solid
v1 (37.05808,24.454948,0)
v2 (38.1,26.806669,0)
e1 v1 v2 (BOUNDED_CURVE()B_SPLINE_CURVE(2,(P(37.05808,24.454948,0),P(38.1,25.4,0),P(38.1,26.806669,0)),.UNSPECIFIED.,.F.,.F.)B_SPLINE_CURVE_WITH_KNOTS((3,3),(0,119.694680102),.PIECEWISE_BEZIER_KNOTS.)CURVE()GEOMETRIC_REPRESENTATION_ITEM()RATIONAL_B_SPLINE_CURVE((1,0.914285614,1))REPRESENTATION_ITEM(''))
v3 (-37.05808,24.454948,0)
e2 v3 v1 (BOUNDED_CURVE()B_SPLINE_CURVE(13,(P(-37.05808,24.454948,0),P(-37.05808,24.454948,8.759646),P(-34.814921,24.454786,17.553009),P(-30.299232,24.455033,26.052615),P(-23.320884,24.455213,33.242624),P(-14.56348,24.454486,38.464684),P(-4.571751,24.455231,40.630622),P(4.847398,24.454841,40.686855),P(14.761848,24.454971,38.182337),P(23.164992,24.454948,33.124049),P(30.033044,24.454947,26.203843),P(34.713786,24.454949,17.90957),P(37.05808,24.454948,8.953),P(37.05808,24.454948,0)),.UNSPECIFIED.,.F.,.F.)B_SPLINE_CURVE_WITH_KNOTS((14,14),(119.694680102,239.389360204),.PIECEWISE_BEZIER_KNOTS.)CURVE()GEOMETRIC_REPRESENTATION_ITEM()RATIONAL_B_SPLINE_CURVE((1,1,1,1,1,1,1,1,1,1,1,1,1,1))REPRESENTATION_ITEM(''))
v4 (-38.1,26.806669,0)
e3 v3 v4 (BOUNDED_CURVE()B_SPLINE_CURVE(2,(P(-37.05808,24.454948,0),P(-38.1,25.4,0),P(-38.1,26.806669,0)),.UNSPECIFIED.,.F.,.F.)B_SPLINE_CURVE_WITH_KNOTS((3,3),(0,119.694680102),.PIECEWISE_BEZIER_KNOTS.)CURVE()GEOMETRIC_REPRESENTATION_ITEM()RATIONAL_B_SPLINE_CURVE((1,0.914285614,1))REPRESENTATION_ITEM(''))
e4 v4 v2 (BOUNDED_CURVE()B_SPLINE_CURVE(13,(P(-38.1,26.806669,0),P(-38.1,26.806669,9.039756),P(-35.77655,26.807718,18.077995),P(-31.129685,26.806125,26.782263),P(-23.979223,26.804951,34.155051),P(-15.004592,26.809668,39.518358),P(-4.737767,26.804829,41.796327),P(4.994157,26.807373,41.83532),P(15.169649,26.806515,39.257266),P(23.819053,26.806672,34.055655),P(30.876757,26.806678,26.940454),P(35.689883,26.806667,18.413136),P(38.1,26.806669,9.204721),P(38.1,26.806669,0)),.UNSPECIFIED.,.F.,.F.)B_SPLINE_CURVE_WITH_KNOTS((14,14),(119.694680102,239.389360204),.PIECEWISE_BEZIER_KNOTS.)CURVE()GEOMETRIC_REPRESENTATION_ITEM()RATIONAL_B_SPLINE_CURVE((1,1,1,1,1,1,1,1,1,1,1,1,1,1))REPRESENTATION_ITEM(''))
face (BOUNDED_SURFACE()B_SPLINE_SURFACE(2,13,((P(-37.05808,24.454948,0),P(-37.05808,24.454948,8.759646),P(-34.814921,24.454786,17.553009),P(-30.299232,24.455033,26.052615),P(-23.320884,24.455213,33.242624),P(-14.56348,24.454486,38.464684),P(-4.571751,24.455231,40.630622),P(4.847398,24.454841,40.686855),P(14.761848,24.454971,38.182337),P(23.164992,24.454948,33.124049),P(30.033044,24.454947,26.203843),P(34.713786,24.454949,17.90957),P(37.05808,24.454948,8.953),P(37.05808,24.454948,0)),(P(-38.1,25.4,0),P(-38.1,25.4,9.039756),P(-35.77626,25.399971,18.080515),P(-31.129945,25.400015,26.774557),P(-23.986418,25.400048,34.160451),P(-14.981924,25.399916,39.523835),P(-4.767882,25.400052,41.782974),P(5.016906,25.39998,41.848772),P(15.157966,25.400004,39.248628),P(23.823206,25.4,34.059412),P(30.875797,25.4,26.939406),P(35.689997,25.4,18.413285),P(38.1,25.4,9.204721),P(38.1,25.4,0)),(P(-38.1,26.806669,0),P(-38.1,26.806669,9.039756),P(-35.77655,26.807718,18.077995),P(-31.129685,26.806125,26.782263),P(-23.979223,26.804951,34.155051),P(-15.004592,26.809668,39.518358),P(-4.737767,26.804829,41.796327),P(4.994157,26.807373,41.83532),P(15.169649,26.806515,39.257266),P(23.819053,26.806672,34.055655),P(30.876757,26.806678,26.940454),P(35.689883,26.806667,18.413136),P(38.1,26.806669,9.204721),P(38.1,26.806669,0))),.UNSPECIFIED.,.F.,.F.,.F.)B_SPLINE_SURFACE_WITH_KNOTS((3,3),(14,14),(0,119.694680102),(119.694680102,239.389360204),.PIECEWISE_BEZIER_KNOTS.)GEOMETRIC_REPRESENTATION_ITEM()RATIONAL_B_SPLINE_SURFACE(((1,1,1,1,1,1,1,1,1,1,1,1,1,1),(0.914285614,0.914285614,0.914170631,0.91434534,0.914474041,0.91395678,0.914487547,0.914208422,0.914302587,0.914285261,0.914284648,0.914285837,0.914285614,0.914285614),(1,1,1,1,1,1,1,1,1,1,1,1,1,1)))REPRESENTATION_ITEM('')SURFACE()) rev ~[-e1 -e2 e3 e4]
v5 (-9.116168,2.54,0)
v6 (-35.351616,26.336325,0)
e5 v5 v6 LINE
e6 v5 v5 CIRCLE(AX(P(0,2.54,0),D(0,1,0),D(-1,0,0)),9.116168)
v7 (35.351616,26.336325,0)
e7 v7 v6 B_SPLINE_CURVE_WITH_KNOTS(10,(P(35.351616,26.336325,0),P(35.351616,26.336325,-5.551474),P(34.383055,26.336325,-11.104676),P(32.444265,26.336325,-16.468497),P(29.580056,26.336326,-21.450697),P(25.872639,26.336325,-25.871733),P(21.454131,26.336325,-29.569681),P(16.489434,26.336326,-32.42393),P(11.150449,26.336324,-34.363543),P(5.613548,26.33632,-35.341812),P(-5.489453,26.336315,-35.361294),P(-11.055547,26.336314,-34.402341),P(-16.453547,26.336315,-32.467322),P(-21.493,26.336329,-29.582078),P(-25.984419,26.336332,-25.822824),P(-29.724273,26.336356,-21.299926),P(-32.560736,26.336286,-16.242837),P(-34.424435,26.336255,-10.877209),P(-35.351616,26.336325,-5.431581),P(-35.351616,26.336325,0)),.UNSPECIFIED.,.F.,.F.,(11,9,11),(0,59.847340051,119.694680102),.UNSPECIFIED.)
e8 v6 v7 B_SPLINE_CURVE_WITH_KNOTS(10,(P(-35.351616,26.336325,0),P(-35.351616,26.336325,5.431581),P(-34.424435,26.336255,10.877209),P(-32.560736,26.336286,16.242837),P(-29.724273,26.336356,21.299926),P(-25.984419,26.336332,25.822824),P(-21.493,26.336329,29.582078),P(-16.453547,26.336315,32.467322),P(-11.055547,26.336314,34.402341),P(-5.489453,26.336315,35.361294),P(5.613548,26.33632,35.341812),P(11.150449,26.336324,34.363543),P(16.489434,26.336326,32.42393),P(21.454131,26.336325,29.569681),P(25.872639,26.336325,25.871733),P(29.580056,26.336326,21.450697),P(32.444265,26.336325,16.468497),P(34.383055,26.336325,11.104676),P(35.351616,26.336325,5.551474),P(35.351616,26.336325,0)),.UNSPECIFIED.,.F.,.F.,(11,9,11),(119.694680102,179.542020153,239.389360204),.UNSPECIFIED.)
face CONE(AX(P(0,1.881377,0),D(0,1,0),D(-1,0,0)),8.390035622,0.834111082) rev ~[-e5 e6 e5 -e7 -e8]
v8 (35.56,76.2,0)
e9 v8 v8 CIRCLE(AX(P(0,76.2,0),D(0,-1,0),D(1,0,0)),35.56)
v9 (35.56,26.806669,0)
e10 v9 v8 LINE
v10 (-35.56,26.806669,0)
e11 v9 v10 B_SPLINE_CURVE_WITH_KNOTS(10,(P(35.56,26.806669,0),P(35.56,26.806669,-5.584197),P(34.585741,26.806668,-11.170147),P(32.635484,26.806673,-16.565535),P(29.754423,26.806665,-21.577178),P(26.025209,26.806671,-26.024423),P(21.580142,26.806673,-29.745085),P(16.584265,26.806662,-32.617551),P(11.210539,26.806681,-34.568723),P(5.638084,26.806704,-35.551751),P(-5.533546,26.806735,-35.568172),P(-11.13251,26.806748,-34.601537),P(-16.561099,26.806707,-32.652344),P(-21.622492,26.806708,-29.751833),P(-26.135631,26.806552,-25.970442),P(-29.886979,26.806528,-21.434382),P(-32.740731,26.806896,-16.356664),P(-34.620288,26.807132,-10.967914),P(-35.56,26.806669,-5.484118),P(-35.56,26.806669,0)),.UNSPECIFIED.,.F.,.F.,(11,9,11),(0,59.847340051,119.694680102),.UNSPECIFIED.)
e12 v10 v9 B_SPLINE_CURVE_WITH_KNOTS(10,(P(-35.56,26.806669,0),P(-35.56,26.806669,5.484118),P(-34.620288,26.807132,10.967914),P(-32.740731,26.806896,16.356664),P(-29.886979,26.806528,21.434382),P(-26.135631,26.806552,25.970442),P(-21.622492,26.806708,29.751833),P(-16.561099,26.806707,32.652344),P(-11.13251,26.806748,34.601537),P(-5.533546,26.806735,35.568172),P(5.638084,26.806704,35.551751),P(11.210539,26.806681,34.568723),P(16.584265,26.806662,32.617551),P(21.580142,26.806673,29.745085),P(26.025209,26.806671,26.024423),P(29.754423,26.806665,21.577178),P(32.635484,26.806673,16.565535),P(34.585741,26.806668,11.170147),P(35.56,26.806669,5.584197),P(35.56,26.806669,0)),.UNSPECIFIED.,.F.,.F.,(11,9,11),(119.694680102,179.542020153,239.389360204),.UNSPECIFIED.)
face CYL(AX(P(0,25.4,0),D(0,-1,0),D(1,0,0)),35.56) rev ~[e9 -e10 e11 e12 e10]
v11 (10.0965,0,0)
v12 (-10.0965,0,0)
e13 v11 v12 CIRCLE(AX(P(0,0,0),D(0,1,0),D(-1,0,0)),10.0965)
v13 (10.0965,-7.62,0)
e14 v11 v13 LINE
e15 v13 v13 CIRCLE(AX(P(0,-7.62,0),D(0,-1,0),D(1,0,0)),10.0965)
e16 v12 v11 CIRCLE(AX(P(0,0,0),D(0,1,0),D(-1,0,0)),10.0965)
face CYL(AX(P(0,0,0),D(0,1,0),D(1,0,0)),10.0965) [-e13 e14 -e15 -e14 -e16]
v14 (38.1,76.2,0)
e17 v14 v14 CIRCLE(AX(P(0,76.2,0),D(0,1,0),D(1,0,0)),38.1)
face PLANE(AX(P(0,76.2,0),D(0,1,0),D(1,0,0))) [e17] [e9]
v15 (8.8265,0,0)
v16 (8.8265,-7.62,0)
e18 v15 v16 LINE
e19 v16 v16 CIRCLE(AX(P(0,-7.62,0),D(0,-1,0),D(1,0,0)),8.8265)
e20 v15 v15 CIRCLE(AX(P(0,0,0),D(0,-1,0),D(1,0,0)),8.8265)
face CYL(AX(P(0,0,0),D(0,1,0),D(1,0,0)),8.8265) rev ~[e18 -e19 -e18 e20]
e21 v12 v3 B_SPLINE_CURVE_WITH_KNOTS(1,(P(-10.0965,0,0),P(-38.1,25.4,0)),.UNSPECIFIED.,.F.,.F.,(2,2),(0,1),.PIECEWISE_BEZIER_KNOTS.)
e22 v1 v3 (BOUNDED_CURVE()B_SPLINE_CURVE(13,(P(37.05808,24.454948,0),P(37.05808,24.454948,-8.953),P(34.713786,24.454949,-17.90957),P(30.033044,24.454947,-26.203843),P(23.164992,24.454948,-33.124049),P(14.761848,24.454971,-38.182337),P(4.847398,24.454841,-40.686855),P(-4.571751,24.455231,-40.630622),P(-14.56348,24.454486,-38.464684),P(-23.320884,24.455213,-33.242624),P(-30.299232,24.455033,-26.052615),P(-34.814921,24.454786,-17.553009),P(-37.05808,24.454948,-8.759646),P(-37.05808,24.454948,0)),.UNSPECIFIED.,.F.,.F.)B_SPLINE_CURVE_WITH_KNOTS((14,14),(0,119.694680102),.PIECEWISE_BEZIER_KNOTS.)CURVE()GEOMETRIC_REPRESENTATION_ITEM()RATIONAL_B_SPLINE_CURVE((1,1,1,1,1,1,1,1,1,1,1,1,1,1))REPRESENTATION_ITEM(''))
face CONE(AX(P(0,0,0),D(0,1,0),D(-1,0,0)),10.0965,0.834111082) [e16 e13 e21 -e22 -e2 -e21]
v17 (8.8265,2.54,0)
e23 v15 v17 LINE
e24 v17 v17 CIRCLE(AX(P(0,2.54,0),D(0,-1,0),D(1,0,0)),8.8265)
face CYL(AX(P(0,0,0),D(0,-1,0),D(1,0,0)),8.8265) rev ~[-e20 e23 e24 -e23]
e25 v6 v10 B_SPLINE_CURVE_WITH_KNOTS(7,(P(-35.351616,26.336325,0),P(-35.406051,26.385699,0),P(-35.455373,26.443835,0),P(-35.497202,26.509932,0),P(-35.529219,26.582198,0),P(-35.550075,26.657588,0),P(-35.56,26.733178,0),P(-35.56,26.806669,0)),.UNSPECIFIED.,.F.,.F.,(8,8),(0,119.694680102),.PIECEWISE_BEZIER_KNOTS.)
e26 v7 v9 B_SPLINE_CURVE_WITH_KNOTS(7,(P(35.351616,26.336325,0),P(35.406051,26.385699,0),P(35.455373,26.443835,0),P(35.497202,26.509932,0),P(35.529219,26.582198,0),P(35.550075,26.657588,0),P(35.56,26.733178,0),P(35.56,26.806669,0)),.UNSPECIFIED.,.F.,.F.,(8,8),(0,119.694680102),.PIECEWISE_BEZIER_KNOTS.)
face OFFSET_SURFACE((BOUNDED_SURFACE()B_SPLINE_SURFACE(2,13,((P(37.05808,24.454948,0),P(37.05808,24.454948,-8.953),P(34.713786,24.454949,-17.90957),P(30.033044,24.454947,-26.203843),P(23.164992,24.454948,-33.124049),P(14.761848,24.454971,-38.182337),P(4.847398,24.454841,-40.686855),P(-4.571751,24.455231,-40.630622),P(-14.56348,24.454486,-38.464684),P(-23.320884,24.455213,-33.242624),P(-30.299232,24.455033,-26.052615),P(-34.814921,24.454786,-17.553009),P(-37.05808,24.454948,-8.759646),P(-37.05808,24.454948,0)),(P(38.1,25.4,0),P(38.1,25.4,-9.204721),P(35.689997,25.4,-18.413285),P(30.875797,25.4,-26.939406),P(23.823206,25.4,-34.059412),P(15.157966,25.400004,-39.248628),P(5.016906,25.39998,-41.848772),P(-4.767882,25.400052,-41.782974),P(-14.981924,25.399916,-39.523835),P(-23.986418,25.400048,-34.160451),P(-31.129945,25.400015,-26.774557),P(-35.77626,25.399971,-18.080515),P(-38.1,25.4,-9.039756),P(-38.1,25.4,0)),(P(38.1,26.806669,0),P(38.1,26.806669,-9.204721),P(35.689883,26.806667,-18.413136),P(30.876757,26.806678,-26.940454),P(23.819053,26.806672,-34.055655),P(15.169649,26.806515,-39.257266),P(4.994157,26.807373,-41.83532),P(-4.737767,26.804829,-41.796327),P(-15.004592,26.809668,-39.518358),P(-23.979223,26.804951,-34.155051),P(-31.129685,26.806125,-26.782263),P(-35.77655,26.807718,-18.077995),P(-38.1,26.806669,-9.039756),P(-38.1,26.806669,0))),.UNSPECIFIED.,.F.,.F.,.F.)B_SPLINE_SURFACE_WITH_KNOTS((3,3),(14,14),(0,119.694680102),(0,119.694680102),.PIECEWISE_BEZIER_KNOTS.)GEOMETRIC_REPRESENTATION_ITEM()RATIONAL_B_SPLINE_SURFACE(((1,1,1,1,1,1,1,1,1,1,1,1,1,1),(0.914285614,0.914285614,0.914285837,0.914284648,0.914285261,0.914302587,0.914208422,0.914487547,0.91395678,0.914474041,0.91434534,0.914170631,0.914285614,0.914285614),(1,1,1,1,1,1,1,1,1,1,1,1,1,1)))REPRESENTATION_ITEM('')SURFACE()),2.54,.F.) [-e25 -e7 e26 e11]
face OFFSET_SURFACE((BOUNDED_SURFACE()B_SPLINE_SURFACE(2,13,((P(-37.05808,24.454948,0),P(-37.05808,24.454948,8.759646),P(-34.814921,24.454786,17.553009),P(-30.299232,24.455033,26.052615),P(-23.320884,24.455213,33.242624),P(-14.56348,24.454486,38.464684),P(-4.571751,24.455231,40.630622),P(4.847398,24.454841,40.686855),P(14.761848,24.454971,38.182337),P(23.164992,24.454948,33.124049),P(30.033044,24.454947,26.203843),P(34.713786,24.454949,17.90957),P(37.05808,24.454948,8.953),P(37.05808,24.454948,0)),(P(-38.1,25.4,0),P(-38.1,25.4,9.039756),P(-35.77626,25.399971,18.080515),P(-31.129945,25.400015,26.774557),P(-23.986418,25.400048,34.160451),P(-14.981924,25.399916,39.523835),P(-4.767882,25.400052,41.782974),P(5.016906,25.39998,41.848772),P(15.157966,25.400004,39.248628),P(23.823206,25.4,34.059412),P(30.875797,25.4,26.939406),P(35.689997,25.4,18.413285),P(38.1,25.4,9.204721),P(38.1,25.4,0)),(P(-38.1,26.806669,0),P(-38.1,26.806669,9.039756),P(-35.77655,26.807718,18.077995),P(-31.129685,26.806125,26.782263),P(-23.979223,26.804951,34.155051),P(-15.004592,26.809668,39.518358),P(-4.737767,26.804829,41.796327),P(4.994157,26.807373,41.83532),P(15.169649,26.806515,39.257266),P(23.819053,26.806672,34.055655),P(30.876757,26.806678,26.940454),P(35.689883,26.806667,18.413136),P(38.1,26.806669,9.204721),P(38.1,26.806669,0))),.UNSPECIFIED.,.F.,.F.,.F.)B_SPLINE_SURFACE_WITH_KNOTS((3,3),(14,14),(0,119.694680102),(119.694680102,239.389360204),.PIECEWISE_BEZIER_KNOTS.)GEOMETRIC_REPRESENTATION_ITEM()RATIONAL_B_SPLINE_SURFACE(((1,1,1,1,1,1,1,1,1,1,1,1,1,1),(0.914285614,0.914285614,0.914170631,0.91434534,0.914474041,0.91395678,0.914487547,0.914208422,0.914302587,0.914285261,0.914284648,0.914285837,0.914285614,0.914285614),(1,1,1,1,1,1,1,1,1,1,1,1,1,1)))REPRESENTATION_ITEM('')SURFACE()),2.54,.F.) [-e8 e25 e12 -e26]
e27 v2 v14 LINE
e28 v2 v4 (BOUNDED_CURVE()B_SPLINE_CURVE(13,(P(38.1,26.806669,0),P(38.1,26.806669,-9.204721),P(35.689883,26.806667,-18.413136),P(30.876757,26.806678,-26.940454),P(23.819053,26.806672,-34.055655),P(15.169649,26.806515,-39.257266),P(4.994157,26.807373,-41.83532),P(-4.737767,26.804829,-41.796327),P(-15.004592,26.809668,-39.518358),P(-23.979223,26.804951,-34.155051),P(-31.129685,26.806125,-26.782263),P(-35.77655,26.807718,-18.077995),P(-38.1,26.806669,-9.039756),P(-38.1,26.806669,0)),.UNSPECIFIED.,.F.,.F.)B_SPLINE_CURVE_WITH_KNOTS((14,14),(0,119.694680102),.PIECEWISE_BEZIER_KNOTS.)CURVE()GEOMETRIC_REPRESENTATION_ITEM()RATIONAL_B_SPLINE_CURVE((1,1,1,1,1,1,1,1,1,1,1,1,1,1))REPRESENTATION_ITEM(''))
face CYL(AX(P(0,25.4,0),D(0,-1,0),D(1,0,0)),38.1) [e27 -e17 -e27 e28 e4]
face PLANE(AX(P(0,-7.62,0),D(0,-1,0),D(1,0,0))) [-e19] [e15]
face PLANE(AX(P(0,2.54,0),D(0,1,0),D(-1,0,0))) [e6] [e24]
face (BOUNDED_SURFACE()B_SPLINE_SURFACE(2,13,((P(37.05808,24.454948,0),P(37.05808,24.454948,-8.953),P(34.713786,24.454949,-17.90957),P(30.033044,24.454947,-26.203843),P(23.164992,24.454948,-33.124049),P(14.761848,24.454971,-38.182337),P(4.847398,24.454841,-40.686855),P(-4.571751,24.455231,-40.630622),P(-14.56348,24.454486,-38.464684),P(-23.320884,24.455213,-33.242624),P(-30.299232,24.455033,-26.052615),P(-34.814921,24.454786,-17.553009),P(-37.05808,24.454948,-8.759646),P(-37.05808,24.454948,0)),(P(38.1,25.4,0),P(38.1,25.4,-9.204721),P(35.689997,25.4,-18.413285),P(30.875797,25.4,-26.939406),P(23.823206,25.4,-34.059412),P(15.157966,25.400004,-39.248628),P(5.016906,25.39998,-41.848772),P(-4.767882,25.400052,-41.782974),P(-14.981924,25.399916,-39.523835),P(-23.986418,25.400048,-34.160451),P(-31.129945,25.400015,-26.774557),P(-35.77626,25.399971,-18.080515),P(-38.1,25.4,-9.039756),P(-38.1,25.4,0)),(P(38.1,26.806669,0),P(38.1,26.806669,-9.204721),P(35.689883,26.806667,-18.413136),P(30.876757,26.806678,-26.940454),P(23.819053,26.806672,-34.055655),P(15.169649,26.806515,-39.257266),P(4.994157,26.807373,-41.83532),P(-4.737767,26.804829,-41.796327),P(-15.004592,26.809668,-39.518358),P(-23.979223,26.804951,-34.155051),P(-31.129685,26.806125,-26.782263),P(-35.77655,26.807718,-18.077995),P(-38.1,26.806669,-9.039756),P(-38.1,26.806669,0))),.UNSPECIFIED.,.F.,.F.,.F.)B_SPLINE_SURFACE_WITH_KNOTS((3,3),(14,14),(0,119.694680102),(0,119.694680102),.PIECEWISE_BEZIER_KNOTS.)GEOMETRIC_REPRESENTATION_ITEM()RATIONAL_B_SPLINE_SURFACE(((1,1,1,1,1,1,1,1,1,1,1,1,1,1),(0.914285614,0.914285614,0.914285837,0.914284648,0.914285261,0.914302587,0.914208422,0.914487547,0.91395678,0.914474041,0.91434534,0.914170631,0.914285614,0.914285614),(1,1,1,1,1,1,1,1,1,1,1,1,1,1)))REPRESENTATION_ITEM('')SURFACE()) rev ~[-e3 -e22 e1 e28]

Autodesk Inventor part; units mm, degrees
ref_plane "YZ Plane" through (0, 0, 0) normal (1, 0, 0) x (0, 1, 0)
ref_plane "XZ Plane" through (0, 0, 0) normal (0, 1, 0) x (-1, 0, 0)
ref_plane "XY Plane" through (0, 0, 0) normal (0, 0, 1) x (1, 0, 0)
sketch "Sketch1" plane through (0, 0, 0) normal (0, 1, 0) x (-1, 0, 0)
  circle A0 centre (0, 0) radius 10.0965
  dimension "d0" = 20.193
extrude "Extrusion1" add sketch "Sketch1" along normal blind 25.4
sketch "Sketch2" plane through (0, 25.4, 0) normal (0, 1, 0) x (1, 0, 0)
  circle A0 centre (0, 0) radius 10.0965 projected
  circle A1 centre (0, 0) radius 38.1
  dimension "d3" = 76.2
extrude "Extrusion2" add sketch "Sketch2" along normal blind 50.8
loft "Loft1" add section 1 edges at (10.0965, 0, 0) section 2 edges at (-38.1, 25.4, 0)
fillet "Fillet1" radius 3.175 2 edges at (0, 25.4, -38.1) (0, 25.4, 38.1)
sketch "Sketch3" plane through (0, 25.4, 0) normal (0, 1, 0) x (1, 0, 0)
  circle A0 centre (0, 0) radius 10.0965 projected
  circle A1 centre (0, 0) radius 10.0965
extrude "Extrusion3" add sketch "Sketch3" along normal blind 50.8
shell "Shell1" thickness 2.54 removed faces 1 at (18.352, 76.2, 0)
sketch "Sketch4" plane through (0, 0, 0) normal (0, -1, 0) x (1, 0, 0)
  circle A0 centre (0, 0) radius 10.0965 projected
  circle A1 centre (0, 0) radius 8.8265
  dimension "d14" = 17.653
extrude "Extrusion4" cut sketch "Sketch4" against normal blind 50.8 contours A1
sketch "Sketch5" plane through (0, 0, 0) normal (0, -1, 0) x (1, 0, 0)
  circle A0 centre (0, 0) radius 8.8265 projected
  circle A1 centre (0, 0) radius 10.0965 projected
  circle A2 centre (0, 0) radius 8.8265
  circle A3 centre (0, 0) radius 10.0965
extrude "Extrusion5" add sketch "Sketch5" along normal blind 7.62
properties part number "Hopper"
